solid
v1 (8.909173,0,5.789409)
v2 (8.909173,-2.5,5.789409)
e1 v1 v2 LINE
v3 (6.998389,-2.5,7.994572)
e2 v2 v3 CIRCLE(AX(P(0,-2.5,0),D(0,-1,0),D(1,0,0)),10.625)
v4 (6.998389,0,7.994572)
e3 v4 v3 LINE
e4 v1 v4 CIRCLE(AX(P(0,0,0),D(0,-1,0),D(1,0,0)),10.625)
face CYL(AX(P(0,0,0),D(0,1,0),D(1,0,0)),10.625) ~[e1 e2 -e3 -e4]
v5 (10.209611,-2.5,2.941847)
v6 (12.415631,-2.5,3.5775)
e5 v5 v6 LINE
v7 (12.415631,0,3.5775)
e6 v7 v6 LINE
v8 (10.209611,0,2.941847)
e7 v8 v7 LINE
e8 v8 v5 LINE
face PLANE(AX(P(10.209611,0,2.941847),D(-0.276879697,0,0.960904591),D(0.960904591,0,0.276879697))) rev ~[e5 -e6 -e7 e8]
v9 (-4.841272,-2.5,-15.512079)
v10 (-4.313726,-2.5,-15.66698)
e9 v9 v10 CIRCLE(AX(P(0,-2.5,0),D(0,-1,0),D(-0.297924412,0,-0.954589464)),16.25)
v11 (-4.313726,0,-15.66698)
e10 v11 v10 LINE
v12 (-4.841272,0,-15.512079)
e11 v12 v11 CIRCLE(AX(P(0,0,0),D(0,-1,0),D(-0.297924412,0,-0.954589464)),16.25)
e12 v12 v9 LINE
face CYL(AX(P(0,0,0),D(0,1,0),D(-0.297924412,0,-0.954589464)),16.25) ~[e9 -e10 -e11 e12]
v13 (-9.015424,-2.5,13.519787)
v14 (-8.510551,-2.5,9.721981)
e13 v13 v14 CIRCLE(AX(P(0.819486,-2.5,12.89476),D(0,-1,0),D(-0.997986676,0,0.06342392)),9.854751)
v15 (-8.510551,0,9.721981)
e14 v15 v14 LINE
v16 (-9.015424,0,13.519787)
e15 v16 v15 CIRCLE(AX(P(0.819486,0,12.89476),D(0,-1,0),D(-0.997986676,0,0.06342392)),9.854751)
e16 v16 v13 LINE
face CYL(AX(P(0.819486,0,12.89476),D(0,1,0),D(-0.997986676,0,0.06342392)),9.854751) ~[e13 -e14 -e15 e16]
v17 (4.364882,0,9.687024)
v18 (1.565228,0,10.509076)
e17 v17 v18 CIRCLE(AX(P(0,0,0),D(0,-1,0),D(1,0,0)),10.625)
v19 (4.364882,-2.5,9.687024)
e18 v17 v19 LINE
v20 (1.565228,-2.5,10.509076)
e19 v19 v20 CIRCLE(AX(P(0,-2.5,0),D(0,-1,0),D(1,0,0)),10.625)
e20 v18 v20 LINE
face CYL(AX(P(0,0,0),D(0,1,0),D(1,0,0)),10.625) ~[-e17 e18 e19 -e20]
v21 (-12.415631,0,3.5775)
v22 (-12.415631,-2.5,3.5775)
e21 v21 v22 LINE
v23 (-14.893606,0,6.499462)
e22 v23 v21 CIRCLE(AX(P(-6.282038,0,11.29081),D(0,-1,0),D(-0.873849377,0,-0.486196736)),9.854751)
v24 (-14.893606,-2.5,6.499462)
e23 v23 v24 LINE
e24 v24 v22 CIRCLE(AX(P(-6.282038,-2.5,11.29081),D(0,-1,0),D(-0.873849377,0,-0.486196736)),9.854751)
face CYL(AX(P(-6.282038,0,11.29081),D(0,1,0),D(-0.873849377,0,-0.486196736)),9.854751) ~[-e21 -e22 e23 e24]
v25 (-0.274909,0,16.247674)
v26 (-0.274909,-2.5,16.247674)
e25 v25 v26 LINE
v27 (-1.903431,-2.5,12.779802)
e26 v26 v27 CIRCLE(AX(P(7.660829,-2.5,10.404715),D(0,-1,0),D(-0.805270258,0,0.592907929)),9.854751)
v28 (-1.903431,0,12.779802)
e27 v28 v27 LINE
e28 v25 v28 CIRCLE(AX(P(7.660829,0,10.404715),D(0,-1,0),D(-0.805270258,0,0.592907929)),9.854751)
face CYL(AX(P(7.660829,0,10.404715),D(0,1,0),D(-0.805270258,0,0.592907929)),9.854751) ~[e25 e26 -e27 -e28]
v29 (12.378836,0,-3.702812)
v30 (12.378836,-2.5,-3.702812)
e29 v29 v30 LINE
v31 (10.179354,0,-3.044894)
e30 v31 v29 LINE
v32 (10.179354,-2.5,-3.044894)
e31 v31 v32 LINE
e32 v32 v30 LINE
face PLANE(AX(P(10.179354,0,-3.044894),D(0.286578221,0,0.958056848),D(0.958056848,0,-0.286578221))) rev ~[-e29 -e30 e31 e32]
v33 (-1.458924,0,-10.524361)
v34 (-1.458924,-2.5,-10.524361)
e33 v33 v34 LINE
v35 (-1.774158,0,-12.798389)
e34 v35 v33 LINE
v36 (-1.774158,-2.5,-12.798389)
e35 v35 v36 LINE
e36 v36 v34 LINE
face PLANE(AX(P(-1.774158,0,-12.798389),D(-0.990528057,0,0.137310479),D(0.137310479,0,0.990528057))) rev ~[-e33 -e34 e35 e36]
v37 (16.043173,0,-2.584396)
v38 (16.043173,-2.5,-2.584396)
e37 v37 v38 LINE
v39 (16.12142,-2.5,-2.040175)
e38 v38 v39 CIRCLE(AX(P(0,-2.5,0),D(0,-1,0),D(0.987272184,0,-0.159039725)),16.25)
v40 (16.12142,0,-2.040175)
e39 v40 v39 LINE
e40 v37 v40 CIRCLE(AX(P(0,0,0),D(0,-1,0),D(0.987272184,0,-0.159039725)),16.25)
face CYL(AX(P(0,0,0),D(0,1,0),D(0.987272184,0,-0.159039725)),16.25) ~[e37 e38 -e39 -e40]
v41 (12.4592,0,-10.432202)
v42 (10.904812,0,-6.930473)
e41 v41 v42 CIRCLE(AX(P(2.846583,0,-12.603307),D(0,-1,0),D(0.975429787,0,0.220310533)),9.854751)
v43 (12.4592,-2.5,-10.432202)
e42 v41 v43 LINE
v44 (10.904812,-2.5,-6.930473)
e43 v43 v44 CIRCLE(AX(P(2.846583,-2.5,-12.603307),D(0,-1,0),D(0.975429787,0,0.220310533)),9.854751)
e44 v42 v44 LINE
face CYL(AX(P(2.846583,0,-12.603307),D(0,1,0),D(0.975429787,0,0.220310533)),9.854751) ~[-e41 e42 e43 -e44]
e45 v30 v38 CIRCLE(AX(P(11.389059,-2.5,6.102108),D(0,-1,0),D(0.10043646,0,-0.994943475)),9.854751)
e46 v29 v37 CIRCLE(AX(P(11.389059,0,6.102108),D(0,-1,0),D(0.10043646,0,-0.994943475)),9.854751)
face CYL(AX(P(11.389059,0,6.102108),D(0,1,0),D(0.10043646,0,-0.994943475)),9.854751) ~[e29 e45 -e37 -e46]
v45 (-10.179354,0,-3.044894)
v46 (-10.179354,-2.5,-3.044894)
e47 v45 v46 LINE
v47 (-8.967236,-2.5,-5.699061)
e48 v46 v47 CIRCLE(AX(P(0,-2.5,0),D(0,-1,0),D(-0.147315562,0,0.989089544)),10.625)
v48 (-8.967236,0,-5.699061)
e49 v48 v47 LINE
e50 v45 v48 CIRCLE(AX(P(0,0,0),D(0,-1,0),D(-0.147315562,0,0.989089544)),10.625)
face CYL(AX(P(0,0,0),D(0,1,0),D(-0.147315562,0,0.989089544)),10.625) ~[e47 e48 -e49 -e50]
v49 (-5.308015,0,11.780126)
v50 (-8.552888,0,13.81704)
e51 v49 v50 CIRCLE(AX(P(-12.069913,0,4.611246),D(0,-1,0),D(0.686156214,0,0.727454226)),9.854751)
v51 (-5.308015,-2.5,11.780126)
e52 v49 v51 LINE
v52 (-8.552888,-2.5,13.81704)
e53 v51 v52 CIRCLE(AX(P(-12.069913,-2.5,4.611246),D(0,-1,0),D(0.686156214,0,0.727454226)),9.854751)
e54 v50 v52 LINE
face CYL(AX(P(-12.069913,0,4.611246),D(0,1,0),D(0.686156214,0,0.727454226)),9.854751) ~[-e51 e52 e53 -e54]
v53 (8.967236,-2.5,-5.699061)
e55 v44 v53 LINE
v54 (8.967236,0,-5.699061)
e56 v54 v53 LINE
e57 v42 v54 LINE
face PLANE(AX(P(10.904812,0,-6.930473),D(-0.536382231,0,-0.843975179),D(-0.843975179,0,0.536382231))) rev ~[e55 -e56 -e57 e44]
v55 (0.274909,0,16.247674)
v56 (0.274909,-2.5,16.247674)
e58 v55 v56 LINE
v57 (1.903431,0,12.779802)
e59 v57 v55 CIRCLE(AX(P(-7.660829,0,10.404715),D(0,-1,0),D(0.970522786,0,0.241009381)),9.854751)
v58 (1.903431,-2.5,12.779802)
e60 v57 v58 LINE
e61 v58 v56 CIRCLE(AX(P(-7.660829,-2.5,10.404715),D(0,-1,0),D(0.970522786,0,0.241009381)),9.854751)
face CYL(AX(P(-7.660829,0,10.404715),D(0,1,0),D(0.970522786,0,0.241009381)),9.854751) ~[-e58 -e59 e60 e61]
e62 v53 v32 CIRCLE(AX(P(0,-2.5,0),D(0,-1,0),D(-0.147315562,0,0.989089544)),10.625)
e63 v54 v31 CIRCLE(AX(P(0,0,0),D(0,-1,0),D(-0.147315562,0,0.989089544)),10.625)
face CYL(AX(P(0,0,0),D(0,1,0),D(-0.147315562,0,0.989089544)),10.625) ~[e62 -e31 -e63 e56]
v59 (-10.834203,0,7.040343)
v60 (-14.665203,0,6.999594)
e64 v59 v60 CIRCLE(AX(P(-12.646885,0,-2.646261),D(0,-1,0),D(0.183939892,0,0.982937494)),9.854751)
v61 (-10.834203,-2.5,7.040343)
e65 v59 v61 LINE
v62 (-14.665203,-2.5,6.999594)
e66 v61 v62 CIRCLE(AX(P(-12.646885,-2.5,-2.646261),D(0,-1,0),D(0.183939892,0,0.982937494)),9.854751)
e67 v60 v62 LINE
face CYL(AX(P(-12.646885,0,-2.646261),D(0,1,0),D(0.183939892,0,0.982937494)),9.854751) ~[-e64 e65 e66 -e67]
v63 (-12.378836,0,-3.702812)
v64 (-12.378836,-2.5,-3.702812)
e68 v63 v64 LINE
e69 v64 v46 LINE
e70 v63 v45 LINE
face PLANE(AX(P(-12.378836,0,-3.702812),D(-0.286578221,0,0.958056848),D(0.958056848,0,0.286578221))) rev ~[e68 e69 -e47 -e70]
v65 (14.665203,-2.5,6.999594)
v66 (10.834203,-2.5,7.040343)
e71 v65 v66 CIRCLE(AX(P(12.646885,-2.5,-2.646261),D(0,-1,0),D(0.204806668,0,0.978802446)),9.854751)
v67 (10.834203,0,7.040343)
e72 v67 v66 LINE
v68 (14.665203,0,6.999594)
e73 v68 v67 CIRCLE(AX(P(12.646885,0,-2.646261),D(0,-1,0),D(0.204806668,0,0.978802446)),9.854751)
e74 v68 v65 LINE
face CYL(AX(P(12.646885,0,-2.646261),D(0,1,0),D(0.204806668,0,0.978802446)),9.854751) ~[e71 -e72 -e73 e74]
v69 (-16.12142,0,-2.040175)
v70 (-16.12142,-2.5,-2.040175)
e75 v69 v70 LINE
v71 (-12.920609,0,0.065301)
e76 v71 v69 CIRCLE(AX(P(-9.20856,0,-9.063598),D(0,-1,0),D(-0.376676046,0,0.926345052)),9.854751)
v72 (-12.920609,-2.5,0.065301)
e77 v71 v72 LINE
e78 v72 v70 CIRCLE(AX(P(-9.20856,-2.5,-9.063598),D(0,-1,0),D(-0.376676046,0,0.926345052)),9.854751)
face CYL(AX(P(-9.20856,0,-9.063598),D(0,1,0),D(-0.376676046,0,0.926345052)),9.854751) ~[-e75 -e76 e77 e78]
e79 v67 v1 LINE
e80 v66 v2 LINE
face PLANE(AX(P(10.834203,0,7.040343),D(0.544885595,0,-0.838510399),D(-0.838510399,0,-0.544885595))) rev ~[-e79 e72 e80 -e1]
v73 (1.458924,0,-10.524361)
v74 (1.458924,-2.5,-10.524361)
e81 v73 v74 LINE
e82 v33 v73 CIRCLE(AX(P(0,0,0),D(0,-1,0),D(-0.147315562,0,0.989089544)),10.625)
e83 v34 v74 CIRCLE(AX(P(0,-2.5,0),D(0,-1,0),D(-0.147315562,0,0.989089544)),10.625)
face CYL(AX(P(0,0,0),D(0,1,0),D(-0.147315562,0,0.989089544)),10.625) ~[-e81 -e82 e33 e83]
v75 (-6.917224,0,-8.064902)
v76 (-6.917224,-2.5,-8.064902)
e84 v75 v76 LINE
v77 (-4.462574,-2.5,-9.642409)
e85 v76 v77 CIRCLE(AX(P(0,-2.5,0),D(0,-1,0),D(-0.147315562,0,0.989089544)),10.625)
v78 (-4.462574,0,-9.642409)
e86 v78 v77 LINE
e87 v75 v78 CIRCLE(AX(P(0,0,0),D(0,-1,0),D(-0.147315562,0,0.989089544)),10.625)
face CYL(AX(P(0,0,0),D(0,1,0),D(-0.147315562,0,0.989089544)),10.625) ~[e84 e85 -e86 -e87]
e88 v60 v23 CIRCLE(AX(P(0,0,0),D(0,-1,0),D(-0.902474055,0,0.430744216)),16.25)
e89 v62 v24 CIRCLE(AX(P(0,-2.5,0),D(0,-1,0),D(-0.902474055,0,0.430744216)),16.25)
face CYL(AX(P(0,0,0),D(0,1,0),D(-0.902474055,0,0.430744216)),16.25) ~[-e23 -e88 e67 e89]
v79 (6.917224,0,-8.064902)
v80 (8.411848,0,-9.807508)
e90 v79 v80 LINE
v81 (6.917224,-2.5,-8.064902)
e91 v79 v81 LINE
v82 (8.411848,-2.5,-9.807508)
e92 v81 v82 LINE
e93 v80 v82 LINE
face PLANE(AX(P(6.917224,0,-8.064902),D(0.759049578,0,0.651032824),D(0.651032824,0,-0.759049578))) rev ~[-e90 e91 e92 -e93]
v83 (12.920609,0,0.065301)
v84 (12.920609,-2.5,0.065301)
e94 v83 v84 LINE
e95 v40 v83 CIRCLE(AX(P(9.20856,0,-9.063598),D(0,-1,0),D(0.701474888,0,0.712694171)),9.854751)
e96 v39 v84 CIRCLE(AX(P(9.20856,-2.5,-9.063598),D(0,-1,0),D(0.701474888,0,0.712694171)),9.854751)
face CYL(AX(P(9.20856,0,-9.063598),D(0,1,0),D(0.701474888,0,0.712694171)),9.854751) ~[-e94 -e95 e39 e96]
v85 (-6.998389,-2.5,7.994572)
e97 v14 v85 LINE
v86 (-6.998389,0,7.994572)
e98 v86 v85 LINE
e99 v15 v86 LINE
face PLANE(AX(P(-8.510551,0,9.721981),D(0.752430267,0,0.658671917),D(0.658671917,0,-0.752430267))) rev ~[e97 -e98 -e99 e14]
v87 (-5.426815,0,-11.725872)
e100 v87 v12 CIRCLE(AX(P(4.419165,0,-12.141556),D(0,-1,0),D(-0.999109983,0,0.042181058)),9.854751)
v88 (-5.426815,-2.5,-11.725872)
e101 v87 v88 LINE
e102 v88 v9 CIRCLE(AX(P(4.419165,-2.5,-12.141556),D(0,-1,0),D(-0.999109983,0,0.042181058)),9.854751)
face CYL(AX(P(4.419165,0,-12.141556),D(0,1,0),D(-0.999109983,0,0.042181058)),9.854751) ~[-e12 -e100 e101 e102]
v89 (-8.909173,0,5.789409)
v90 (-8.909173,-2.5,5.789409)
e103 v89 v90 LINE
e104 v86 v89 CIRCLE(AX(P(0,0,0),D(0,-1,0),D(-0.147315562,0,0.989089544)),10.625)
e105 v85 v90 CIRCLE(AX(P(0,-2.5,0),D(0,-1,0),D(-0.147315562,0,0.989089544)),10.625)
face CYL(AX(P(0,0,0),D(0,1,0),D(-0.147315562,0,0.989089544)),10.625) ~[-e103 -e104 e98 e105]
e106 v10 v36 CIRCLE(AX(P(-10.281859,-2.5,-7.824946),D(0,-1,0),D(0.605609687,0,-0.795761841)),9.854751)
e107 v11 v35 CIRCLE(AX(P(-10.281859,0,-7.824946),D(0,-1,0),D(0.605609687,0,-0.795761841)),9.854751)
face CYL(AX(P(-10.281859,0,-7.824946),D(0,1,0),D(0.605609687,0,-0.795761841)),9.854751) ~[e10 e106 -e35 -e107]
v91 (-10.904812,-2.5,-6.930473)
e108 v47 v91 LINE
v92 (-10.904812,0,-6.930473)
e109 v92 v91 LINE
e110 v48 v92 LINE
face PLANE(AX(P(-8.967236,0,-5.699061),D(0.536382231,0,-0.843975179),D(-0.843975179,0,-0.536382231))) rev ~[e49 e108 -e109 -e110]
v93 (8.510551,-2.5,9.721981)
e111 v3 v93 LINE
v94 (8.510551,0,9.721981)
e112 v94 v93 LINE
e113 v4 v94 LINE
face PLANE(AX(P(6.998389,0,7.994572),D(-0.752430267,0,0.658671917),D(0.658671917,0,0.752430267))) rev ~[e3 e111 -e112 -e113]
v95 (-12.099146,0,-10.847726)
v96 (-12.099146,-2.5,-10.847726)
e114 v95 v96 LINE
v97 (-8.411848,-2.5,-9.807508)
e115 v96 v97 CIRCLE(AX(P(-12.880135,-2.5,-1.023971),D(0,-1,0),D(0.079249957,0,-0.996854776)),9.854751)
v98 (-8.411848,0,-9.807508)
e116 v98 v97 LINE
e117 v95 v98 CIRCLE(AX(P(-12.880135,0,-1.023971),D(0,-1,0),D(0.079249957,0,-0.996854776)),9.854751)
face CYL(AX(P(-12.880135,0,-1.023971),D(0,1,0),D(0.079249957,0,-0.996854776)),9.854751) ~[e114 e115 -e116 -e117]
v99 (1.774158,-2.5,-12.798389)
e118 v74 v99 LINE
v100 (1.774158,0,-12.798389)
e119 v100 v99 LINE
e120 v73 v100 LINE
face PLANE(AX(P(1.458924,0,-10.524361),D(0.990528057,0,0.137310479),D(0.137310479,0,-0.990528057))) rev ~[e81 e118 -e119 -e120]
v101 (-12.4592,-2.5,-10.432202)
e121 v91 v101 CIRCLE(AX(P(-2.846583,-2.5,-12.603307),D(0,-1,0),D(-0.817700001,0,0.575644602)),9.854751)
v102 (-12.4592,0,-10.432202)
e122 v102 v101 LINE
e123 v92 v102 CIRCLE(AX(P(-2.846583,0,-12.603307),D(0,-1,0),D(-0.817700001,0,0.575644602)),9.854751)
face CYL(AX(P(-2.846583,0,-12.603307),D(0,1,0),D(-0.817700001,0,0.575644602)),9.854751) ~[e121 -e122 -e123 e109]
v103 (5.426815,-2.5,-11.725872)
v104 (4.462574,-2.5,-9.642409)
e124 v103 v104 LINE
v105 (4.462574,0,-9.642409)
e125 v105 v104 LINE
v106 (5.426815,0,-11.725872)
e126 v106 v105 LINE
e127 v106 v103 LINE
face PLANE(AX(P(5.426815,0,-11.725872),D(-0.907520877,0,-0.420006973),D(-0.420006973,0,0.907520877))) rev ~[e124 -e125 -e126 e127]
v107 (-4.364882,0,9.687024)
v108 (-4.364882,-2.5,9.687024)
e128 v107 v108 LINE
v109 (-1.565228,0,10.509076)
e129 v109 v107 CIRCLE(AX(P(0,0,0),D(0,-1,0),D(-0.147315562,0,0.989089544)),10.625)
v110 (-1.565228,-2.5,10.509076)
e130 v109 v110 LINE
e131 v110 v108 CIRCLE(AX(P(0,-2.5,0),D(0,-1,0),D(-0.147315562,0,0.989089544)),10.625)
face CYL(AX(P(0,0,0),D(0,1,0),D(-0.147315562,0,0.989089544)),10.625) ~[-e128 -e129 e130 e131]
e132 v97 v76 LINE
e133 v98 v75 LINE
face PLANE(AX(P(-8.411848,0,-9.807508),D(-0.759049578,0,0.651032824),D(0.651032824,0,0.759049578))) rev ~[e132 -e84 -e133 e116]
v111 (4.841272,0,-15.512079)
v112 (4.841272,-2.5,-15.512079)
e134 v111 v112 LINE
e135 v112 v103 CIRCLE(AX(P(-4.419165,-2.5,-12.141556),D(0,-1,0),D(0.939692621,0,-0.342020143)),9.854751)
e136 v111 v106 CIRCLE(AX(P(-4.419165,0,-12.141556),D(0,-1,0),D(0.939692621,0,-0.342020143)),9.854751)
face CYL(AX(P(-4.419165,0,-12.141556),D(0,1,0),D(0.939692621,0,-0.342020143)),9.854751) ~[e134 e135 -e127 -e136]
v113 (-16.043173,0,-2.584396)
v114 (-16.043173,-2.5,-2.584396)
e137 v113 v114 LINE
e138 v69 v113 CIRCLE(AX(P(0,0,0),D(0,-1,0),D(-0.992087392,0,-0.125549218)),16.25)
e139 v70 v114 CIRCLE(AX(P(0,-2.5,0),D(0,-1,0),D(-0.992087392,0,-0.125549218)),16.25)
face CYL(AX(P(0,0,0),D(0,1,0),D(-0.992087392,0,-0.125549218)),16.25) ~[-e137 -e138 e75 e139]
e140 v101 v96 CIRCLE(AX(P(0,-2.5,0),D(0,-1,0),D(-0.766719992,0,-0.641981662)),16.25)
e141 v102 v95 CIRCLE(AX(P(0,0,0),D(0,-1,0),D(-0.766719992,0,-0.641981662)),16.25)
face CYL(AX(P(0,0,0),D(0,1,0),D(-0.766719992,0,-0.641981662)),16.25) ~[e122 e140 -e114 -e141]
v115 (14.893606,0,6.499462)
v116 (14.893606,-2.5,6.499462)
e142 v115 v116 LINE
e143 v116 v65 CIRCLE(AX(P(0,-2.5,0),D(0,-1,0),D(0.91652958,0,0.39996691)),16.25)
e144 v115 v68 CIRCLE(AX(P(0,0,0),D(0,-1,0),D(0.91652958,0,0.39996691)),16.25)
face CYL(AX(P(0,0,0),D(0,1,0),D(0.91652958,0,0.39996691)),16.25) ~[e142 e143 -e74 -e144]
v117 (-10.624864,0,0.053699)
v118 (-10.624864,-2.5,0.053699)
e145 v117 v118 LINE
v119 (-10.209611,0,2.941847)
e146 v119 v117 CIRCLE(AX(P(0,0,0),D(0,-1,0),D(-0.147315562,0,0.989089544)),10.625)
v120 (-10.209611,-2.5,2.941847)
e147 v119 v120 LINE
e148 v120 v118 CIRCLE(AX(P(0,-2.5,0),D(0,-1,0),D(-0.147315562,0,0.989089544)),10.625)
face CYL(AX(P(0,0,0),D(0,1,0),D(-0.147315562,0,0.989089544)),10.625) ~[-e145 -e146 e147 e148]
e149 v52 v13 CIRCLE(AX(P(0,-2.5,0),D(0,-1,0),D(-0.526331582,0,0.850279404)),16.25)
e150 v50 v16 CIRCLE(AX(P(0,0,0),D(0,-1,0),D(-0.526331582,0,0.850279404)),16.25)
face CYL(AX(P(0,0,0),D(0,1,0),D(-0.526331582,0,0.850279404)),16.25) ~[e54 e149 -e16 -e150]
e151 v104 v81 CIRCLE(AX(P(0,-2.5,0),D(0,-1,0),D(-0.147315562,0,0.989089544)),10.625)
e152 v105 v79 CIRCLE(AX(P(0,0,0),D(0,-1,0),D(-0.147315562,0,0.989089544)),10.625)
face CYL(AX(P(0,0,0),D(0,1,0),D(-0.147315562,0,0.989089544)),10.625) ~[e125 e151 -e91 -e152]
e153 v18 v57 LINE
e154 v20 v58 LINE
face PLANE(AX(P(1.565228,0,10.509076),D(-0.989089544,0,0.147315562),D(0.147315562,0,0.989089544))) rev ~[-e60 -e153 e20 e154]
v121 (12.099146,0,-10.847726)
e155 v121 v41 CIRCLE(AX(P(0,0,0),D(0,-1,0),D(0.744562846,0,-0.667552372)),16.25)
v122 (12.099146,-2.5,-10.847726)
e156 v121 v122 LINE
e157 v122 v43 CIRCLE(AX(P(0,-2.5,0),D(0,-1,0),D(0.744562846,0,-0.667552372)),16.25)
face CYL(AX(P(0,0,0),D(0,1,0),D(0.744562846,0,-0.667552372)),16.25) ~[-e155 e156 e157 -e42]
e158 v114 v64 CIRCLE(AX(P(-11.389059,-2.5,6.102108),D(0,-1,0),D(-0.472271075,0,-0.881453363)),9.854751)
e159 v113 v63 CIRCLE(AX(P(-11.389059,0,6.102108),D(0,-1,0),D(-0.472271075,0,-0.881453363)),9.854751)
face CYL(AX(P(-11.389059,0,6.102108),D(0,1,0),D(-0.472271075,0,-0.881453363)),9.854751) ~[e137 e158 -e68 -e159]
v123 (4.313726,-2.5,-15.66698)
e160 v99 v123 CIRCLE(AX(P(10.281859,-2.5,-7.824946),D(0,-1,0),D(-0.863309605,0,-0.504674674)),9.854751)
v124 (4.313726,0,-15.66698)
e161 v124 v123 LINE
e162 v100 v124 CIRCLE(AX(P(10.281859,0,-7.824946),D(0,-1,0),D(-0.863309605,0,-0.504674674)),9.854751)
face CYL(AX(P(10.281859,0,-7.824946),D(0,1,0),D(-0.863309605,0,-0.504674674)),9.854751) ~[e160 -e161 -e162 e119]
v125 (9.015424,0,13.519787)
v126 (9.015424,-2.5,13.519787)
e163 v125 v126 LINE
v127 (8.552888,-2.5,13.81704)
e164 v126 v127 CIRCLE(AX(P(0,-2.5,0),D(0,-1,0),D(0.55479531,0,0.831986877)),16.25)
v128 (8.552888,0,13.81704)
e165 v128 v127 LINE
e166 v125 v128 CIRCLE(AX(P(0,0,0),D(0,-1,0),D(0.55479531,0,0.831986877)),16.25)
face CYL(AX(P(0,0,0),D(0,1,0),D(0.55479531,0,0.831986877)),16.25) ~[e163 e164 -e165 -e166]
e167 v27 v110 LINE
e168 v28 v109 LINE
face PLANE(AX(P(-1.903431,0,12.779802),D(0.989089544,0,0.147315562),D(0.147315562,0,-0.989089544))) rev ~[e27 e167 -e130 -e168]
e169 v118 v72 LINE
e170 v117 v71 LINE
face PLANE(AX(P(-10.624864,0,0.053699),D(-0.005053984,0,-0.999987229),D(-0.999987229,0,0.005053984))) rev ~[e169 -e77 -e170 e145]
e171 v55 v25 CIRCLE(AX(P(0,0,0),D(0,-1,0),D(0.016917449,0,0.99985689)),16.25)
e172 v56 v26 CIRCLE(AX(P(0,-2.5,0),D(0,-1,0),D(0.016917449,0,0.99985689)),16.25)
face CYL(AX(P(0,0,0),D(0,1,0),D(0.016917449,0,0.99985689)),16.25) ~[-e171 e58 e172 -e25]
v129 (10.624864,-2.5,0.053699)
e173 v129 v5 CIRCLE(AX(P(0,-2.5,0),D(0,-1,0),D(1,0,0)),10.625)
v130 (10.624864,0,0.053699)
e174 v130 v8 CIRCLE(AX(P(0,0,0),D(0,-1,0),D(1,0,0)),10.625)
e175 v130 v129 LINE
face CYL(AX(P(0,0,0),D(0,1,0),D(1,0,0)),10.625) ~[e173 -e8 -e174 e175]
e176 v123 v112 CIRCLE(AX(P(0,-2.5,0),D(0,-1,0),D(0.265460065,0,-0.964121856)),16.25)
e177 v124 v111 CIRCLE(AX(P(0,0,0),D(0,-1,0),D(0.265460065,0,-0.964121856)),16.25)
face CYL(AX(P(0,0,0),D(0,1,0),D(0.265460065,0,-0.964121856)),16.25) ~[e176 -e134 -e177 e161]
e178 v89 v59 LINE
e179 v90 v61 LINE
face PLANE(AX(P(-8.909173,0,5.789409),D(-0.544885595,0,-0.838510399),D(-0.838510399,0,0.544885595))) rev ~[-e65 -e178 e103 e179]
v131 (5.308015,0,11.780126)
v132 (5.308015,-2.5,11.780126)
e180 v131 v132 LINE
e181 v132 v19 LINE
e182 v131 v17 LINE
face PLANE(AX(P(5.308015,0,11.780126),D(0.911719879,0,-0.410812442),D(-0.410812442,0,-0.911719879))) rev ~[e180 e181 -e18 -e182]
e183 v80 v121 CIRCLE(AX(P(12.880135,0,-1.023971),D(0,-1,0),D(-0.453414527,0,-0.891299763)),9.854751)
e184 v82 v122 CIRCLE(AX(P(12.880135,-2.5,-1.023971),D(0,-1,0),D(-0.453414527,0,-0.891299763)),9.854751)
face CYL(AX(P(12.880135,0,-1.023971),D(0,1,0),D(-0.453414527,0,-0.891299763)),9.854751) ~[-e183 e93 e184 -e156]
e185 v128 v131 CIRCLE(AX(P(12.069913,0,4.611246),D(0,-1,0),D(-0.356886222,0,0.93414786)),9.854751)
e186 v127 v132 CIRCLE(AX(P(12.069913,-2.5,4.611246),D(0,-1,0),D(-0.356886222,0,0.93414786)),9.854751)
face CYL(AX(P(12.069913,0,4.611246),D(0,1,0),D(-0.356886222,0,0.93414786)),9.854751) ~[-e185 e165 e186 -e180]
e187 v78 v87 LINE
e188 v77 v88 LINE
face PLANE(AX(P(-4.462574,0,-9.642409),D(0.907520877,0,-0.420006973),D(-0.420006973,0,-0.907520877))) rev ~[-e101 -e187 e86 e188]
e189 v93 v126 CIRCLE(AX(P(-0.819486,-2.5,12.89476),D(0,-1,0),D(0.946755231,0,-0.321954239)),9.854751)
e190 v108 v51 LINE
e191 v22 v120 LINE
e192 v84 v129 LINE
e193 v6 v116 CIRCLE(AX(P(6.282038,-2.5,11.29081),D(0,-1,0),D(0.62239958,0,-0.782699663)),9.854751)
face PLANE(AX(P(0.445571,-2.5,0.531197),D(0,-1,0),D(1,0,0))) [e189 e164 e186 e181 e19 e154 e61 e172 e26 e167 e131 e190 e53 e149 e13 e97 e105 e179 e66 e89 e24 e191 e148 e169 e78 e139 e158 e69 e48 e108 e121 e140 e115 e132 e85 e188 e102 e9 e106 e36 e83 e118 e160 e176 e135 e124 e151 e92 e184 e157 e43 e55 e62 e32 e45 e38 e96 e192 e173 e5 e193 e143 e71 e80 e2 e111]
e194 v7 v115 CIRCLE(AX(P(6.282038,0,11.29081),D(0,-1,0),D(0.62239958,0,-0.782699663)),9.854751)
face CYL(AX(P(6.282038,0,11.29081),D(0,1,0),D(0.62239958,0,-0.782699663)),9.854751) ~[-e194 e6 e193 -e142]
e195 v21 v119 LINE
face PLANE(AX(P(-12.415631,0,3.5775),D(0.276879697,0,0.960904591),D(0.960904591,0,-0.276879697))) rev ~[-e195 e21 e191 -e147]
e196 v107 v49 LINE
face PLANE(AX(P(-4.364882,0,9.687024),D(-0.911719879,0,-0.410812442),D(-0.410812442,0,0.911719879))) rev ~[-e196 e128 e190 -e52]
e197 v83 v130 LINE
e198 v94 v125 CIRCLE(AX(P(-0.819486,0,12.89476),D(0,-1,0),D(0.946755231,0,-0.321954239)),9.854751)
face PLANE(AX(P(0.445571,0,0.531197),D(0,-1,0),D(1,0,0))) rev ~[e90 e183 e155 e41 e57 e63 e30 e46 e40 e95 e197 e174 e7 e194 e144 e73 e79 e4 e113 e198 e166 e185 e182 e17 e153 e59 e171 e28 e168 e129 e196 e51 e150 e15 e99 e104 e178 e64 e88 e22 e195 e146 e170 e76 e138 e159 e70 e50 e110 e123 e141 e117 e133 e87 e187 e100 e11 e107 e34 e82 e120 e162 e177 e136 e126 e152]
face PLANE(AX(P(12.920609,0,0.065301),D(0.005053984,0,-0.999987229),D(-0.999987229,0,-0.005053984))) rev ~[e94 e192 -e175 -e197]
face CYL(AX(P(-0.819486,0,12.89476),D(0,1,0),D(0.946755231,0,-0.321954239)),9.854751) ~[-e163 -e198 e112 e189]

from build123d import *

# Parameters (mm, degrees)
F2_DEPTH        = 2.5
F2_COPIES_COUNT = 11
F3_DEPTH        = 2.5


# Not quite as in the source:
# - a pattern or mirror of a feature is missing from the dataset's text; its kind, count and spacing are read off the source's solid


with BuildPart() as f2:
    # F1 (on Front) → F2 (new body)
    with BuildSketch(Plane.XZ):
        with BuildLine():
            ThreePointArc((1.9034310201, 12.7798019983), (1.2593174989, 14.5936400637), (0.2749085502, 16.2476744579))
            ThreePointArc((0.2749085502, 16.2476744579), (0, 16.25), (-0.2749085502, 16.2476744579))
            ThreePointArc((-0.2749085502, 16.2476744579), (-1.2593174989, 14.5936400637), (-1.9034310201, 12.7798019983))
            Line((-1.9034310201, 12.7798019983), (-1.5652278506, 10.5090763998))
            ThreePointArc((-1.5652278506, 10.5090763998), (0, 10.625), (1.5652278506, 10.5090763998))
            Line((1.5652278506, 10.5090763998), (1.9034310201, 12.7798019983))
        make_face()
    extrude(amount=F2_DEPTH)


with BuildPart() as f2_copies_1:
    # F2_copies: instance of F2
    add(f2.part.rotate(Axis((0, 0, 0), (0, 1, 0)), 1 * 360 / F2_COPIES_COUNT))


with BuildPart() as f2_copies_2:
    # F2_copies: instance of F2
    add(f2.part.rotate(Axis((0, 0, 0), (0, 1, 0)), 2 * 360 / F2_COPIES_COUNT))


with BuildPart() as f2_copies_3:
    # F2_copies: instance of F2
    add(f2.part.rotate(Axis((0, 0, 0), (0, 1, 0)), 3 * 360 / F2_COPIES_COUNT))


with BuildPart() as f2_copies_4:
    # F2_copies: instance of F2
    add(f2.part.rotate(Axis((0, 0, 0), (0, 1, 0)), 4 * 360 / F2_COPIES_COUNT))


with BuildPart() as f2_copies_5:
    # F2_copies: instance of F2
    add(f2.part.rotate(Axis((0, 0, 0), (0, 1, 0)), 5 * 360 / F2_COPIES_COUNT))


with BuildPart() as f2_copies_6:
    # F2_copies: instance of F2
    add(f2.part.rotate(Axis((0, 0, 0), (0, 1, 0)), 6 * 360 / F2_COPIES_COUNT))


with BuildPart() as f2_copies_7:
    # F2_copies: instance of F2
    add(f2.part.rotate(Axis((0, 0, 0), (0, 1, 0)), 7 * 360 / F2_COPIES_COUNT))


with BuildPart() as f2_copies_8:
    # F2_copies: instance of F2
    add(f2.part.rotate(Axis((0, 0, 0), (0, 1, 0)), 8 * 360 / F2_COPIES_COUNT))


with BuildPart() as f2_copies_9:
    # F2_copies: instance of F2
    add(f2.part.rotate(Axis((0, 0, 0), (0, 1, 0)), 9 * 360 / F2_COPIES_COUNT))


with BuildPart() as f2_copies_10:
    # F2_copies: instance of F2
    add(f2.part.rotate(Axis((0, 0, 0), (0, 1, 0)), 10 * 360 / F2_COPIES_COUNT))


with BuildPart() as f2_1:
    add(f2.part)

    add(f2_copies_1.part)  # F3 merges F2_copies_1

    add(f2_copies_2.part)  # F3 merges F2_copies_2

    add(f2_copies_3.part)  # F3 merges F2_copies_3

    add(f2_copies_4.part)  # F3 merges F2_copies_4

    add(f2_copies_5.part)  # F3 merges F2_copies_5

    add(f2_copies_6.part)  # F3 merges F2_copies_6

    add(f2_copies_7.part)  # F3 merges F2_copies_7

    add(f2_copies_8.part)  # F3 merges F2_copies_8

    add(f2_copies_9.part)  # F3 merges F2_copies_9

    add(f2_copies_10.part)  # F3 merges F2_copies_10
    # F1 (on Front) → F3 (join)
    with BuildSketch(Plane.XZ):
        with BuildLine():
            ThreePointArc((10.625, 0), (8.0473961911, 6.9375816784), (1.5652278506, 10.5090763998))
            ThreePointArc((1.5652278506, 10.5090763998), (0, 10.625), (-1.5652278506, 10.5090763998))
            ThreePointArc((-1.5652278506, 10.5090763998), (-6.9375816784, -8.0473961911), (10.625, 0))
        make_face()
    extrude(amount=F3_DEPTH)


solid = f2_1.part
